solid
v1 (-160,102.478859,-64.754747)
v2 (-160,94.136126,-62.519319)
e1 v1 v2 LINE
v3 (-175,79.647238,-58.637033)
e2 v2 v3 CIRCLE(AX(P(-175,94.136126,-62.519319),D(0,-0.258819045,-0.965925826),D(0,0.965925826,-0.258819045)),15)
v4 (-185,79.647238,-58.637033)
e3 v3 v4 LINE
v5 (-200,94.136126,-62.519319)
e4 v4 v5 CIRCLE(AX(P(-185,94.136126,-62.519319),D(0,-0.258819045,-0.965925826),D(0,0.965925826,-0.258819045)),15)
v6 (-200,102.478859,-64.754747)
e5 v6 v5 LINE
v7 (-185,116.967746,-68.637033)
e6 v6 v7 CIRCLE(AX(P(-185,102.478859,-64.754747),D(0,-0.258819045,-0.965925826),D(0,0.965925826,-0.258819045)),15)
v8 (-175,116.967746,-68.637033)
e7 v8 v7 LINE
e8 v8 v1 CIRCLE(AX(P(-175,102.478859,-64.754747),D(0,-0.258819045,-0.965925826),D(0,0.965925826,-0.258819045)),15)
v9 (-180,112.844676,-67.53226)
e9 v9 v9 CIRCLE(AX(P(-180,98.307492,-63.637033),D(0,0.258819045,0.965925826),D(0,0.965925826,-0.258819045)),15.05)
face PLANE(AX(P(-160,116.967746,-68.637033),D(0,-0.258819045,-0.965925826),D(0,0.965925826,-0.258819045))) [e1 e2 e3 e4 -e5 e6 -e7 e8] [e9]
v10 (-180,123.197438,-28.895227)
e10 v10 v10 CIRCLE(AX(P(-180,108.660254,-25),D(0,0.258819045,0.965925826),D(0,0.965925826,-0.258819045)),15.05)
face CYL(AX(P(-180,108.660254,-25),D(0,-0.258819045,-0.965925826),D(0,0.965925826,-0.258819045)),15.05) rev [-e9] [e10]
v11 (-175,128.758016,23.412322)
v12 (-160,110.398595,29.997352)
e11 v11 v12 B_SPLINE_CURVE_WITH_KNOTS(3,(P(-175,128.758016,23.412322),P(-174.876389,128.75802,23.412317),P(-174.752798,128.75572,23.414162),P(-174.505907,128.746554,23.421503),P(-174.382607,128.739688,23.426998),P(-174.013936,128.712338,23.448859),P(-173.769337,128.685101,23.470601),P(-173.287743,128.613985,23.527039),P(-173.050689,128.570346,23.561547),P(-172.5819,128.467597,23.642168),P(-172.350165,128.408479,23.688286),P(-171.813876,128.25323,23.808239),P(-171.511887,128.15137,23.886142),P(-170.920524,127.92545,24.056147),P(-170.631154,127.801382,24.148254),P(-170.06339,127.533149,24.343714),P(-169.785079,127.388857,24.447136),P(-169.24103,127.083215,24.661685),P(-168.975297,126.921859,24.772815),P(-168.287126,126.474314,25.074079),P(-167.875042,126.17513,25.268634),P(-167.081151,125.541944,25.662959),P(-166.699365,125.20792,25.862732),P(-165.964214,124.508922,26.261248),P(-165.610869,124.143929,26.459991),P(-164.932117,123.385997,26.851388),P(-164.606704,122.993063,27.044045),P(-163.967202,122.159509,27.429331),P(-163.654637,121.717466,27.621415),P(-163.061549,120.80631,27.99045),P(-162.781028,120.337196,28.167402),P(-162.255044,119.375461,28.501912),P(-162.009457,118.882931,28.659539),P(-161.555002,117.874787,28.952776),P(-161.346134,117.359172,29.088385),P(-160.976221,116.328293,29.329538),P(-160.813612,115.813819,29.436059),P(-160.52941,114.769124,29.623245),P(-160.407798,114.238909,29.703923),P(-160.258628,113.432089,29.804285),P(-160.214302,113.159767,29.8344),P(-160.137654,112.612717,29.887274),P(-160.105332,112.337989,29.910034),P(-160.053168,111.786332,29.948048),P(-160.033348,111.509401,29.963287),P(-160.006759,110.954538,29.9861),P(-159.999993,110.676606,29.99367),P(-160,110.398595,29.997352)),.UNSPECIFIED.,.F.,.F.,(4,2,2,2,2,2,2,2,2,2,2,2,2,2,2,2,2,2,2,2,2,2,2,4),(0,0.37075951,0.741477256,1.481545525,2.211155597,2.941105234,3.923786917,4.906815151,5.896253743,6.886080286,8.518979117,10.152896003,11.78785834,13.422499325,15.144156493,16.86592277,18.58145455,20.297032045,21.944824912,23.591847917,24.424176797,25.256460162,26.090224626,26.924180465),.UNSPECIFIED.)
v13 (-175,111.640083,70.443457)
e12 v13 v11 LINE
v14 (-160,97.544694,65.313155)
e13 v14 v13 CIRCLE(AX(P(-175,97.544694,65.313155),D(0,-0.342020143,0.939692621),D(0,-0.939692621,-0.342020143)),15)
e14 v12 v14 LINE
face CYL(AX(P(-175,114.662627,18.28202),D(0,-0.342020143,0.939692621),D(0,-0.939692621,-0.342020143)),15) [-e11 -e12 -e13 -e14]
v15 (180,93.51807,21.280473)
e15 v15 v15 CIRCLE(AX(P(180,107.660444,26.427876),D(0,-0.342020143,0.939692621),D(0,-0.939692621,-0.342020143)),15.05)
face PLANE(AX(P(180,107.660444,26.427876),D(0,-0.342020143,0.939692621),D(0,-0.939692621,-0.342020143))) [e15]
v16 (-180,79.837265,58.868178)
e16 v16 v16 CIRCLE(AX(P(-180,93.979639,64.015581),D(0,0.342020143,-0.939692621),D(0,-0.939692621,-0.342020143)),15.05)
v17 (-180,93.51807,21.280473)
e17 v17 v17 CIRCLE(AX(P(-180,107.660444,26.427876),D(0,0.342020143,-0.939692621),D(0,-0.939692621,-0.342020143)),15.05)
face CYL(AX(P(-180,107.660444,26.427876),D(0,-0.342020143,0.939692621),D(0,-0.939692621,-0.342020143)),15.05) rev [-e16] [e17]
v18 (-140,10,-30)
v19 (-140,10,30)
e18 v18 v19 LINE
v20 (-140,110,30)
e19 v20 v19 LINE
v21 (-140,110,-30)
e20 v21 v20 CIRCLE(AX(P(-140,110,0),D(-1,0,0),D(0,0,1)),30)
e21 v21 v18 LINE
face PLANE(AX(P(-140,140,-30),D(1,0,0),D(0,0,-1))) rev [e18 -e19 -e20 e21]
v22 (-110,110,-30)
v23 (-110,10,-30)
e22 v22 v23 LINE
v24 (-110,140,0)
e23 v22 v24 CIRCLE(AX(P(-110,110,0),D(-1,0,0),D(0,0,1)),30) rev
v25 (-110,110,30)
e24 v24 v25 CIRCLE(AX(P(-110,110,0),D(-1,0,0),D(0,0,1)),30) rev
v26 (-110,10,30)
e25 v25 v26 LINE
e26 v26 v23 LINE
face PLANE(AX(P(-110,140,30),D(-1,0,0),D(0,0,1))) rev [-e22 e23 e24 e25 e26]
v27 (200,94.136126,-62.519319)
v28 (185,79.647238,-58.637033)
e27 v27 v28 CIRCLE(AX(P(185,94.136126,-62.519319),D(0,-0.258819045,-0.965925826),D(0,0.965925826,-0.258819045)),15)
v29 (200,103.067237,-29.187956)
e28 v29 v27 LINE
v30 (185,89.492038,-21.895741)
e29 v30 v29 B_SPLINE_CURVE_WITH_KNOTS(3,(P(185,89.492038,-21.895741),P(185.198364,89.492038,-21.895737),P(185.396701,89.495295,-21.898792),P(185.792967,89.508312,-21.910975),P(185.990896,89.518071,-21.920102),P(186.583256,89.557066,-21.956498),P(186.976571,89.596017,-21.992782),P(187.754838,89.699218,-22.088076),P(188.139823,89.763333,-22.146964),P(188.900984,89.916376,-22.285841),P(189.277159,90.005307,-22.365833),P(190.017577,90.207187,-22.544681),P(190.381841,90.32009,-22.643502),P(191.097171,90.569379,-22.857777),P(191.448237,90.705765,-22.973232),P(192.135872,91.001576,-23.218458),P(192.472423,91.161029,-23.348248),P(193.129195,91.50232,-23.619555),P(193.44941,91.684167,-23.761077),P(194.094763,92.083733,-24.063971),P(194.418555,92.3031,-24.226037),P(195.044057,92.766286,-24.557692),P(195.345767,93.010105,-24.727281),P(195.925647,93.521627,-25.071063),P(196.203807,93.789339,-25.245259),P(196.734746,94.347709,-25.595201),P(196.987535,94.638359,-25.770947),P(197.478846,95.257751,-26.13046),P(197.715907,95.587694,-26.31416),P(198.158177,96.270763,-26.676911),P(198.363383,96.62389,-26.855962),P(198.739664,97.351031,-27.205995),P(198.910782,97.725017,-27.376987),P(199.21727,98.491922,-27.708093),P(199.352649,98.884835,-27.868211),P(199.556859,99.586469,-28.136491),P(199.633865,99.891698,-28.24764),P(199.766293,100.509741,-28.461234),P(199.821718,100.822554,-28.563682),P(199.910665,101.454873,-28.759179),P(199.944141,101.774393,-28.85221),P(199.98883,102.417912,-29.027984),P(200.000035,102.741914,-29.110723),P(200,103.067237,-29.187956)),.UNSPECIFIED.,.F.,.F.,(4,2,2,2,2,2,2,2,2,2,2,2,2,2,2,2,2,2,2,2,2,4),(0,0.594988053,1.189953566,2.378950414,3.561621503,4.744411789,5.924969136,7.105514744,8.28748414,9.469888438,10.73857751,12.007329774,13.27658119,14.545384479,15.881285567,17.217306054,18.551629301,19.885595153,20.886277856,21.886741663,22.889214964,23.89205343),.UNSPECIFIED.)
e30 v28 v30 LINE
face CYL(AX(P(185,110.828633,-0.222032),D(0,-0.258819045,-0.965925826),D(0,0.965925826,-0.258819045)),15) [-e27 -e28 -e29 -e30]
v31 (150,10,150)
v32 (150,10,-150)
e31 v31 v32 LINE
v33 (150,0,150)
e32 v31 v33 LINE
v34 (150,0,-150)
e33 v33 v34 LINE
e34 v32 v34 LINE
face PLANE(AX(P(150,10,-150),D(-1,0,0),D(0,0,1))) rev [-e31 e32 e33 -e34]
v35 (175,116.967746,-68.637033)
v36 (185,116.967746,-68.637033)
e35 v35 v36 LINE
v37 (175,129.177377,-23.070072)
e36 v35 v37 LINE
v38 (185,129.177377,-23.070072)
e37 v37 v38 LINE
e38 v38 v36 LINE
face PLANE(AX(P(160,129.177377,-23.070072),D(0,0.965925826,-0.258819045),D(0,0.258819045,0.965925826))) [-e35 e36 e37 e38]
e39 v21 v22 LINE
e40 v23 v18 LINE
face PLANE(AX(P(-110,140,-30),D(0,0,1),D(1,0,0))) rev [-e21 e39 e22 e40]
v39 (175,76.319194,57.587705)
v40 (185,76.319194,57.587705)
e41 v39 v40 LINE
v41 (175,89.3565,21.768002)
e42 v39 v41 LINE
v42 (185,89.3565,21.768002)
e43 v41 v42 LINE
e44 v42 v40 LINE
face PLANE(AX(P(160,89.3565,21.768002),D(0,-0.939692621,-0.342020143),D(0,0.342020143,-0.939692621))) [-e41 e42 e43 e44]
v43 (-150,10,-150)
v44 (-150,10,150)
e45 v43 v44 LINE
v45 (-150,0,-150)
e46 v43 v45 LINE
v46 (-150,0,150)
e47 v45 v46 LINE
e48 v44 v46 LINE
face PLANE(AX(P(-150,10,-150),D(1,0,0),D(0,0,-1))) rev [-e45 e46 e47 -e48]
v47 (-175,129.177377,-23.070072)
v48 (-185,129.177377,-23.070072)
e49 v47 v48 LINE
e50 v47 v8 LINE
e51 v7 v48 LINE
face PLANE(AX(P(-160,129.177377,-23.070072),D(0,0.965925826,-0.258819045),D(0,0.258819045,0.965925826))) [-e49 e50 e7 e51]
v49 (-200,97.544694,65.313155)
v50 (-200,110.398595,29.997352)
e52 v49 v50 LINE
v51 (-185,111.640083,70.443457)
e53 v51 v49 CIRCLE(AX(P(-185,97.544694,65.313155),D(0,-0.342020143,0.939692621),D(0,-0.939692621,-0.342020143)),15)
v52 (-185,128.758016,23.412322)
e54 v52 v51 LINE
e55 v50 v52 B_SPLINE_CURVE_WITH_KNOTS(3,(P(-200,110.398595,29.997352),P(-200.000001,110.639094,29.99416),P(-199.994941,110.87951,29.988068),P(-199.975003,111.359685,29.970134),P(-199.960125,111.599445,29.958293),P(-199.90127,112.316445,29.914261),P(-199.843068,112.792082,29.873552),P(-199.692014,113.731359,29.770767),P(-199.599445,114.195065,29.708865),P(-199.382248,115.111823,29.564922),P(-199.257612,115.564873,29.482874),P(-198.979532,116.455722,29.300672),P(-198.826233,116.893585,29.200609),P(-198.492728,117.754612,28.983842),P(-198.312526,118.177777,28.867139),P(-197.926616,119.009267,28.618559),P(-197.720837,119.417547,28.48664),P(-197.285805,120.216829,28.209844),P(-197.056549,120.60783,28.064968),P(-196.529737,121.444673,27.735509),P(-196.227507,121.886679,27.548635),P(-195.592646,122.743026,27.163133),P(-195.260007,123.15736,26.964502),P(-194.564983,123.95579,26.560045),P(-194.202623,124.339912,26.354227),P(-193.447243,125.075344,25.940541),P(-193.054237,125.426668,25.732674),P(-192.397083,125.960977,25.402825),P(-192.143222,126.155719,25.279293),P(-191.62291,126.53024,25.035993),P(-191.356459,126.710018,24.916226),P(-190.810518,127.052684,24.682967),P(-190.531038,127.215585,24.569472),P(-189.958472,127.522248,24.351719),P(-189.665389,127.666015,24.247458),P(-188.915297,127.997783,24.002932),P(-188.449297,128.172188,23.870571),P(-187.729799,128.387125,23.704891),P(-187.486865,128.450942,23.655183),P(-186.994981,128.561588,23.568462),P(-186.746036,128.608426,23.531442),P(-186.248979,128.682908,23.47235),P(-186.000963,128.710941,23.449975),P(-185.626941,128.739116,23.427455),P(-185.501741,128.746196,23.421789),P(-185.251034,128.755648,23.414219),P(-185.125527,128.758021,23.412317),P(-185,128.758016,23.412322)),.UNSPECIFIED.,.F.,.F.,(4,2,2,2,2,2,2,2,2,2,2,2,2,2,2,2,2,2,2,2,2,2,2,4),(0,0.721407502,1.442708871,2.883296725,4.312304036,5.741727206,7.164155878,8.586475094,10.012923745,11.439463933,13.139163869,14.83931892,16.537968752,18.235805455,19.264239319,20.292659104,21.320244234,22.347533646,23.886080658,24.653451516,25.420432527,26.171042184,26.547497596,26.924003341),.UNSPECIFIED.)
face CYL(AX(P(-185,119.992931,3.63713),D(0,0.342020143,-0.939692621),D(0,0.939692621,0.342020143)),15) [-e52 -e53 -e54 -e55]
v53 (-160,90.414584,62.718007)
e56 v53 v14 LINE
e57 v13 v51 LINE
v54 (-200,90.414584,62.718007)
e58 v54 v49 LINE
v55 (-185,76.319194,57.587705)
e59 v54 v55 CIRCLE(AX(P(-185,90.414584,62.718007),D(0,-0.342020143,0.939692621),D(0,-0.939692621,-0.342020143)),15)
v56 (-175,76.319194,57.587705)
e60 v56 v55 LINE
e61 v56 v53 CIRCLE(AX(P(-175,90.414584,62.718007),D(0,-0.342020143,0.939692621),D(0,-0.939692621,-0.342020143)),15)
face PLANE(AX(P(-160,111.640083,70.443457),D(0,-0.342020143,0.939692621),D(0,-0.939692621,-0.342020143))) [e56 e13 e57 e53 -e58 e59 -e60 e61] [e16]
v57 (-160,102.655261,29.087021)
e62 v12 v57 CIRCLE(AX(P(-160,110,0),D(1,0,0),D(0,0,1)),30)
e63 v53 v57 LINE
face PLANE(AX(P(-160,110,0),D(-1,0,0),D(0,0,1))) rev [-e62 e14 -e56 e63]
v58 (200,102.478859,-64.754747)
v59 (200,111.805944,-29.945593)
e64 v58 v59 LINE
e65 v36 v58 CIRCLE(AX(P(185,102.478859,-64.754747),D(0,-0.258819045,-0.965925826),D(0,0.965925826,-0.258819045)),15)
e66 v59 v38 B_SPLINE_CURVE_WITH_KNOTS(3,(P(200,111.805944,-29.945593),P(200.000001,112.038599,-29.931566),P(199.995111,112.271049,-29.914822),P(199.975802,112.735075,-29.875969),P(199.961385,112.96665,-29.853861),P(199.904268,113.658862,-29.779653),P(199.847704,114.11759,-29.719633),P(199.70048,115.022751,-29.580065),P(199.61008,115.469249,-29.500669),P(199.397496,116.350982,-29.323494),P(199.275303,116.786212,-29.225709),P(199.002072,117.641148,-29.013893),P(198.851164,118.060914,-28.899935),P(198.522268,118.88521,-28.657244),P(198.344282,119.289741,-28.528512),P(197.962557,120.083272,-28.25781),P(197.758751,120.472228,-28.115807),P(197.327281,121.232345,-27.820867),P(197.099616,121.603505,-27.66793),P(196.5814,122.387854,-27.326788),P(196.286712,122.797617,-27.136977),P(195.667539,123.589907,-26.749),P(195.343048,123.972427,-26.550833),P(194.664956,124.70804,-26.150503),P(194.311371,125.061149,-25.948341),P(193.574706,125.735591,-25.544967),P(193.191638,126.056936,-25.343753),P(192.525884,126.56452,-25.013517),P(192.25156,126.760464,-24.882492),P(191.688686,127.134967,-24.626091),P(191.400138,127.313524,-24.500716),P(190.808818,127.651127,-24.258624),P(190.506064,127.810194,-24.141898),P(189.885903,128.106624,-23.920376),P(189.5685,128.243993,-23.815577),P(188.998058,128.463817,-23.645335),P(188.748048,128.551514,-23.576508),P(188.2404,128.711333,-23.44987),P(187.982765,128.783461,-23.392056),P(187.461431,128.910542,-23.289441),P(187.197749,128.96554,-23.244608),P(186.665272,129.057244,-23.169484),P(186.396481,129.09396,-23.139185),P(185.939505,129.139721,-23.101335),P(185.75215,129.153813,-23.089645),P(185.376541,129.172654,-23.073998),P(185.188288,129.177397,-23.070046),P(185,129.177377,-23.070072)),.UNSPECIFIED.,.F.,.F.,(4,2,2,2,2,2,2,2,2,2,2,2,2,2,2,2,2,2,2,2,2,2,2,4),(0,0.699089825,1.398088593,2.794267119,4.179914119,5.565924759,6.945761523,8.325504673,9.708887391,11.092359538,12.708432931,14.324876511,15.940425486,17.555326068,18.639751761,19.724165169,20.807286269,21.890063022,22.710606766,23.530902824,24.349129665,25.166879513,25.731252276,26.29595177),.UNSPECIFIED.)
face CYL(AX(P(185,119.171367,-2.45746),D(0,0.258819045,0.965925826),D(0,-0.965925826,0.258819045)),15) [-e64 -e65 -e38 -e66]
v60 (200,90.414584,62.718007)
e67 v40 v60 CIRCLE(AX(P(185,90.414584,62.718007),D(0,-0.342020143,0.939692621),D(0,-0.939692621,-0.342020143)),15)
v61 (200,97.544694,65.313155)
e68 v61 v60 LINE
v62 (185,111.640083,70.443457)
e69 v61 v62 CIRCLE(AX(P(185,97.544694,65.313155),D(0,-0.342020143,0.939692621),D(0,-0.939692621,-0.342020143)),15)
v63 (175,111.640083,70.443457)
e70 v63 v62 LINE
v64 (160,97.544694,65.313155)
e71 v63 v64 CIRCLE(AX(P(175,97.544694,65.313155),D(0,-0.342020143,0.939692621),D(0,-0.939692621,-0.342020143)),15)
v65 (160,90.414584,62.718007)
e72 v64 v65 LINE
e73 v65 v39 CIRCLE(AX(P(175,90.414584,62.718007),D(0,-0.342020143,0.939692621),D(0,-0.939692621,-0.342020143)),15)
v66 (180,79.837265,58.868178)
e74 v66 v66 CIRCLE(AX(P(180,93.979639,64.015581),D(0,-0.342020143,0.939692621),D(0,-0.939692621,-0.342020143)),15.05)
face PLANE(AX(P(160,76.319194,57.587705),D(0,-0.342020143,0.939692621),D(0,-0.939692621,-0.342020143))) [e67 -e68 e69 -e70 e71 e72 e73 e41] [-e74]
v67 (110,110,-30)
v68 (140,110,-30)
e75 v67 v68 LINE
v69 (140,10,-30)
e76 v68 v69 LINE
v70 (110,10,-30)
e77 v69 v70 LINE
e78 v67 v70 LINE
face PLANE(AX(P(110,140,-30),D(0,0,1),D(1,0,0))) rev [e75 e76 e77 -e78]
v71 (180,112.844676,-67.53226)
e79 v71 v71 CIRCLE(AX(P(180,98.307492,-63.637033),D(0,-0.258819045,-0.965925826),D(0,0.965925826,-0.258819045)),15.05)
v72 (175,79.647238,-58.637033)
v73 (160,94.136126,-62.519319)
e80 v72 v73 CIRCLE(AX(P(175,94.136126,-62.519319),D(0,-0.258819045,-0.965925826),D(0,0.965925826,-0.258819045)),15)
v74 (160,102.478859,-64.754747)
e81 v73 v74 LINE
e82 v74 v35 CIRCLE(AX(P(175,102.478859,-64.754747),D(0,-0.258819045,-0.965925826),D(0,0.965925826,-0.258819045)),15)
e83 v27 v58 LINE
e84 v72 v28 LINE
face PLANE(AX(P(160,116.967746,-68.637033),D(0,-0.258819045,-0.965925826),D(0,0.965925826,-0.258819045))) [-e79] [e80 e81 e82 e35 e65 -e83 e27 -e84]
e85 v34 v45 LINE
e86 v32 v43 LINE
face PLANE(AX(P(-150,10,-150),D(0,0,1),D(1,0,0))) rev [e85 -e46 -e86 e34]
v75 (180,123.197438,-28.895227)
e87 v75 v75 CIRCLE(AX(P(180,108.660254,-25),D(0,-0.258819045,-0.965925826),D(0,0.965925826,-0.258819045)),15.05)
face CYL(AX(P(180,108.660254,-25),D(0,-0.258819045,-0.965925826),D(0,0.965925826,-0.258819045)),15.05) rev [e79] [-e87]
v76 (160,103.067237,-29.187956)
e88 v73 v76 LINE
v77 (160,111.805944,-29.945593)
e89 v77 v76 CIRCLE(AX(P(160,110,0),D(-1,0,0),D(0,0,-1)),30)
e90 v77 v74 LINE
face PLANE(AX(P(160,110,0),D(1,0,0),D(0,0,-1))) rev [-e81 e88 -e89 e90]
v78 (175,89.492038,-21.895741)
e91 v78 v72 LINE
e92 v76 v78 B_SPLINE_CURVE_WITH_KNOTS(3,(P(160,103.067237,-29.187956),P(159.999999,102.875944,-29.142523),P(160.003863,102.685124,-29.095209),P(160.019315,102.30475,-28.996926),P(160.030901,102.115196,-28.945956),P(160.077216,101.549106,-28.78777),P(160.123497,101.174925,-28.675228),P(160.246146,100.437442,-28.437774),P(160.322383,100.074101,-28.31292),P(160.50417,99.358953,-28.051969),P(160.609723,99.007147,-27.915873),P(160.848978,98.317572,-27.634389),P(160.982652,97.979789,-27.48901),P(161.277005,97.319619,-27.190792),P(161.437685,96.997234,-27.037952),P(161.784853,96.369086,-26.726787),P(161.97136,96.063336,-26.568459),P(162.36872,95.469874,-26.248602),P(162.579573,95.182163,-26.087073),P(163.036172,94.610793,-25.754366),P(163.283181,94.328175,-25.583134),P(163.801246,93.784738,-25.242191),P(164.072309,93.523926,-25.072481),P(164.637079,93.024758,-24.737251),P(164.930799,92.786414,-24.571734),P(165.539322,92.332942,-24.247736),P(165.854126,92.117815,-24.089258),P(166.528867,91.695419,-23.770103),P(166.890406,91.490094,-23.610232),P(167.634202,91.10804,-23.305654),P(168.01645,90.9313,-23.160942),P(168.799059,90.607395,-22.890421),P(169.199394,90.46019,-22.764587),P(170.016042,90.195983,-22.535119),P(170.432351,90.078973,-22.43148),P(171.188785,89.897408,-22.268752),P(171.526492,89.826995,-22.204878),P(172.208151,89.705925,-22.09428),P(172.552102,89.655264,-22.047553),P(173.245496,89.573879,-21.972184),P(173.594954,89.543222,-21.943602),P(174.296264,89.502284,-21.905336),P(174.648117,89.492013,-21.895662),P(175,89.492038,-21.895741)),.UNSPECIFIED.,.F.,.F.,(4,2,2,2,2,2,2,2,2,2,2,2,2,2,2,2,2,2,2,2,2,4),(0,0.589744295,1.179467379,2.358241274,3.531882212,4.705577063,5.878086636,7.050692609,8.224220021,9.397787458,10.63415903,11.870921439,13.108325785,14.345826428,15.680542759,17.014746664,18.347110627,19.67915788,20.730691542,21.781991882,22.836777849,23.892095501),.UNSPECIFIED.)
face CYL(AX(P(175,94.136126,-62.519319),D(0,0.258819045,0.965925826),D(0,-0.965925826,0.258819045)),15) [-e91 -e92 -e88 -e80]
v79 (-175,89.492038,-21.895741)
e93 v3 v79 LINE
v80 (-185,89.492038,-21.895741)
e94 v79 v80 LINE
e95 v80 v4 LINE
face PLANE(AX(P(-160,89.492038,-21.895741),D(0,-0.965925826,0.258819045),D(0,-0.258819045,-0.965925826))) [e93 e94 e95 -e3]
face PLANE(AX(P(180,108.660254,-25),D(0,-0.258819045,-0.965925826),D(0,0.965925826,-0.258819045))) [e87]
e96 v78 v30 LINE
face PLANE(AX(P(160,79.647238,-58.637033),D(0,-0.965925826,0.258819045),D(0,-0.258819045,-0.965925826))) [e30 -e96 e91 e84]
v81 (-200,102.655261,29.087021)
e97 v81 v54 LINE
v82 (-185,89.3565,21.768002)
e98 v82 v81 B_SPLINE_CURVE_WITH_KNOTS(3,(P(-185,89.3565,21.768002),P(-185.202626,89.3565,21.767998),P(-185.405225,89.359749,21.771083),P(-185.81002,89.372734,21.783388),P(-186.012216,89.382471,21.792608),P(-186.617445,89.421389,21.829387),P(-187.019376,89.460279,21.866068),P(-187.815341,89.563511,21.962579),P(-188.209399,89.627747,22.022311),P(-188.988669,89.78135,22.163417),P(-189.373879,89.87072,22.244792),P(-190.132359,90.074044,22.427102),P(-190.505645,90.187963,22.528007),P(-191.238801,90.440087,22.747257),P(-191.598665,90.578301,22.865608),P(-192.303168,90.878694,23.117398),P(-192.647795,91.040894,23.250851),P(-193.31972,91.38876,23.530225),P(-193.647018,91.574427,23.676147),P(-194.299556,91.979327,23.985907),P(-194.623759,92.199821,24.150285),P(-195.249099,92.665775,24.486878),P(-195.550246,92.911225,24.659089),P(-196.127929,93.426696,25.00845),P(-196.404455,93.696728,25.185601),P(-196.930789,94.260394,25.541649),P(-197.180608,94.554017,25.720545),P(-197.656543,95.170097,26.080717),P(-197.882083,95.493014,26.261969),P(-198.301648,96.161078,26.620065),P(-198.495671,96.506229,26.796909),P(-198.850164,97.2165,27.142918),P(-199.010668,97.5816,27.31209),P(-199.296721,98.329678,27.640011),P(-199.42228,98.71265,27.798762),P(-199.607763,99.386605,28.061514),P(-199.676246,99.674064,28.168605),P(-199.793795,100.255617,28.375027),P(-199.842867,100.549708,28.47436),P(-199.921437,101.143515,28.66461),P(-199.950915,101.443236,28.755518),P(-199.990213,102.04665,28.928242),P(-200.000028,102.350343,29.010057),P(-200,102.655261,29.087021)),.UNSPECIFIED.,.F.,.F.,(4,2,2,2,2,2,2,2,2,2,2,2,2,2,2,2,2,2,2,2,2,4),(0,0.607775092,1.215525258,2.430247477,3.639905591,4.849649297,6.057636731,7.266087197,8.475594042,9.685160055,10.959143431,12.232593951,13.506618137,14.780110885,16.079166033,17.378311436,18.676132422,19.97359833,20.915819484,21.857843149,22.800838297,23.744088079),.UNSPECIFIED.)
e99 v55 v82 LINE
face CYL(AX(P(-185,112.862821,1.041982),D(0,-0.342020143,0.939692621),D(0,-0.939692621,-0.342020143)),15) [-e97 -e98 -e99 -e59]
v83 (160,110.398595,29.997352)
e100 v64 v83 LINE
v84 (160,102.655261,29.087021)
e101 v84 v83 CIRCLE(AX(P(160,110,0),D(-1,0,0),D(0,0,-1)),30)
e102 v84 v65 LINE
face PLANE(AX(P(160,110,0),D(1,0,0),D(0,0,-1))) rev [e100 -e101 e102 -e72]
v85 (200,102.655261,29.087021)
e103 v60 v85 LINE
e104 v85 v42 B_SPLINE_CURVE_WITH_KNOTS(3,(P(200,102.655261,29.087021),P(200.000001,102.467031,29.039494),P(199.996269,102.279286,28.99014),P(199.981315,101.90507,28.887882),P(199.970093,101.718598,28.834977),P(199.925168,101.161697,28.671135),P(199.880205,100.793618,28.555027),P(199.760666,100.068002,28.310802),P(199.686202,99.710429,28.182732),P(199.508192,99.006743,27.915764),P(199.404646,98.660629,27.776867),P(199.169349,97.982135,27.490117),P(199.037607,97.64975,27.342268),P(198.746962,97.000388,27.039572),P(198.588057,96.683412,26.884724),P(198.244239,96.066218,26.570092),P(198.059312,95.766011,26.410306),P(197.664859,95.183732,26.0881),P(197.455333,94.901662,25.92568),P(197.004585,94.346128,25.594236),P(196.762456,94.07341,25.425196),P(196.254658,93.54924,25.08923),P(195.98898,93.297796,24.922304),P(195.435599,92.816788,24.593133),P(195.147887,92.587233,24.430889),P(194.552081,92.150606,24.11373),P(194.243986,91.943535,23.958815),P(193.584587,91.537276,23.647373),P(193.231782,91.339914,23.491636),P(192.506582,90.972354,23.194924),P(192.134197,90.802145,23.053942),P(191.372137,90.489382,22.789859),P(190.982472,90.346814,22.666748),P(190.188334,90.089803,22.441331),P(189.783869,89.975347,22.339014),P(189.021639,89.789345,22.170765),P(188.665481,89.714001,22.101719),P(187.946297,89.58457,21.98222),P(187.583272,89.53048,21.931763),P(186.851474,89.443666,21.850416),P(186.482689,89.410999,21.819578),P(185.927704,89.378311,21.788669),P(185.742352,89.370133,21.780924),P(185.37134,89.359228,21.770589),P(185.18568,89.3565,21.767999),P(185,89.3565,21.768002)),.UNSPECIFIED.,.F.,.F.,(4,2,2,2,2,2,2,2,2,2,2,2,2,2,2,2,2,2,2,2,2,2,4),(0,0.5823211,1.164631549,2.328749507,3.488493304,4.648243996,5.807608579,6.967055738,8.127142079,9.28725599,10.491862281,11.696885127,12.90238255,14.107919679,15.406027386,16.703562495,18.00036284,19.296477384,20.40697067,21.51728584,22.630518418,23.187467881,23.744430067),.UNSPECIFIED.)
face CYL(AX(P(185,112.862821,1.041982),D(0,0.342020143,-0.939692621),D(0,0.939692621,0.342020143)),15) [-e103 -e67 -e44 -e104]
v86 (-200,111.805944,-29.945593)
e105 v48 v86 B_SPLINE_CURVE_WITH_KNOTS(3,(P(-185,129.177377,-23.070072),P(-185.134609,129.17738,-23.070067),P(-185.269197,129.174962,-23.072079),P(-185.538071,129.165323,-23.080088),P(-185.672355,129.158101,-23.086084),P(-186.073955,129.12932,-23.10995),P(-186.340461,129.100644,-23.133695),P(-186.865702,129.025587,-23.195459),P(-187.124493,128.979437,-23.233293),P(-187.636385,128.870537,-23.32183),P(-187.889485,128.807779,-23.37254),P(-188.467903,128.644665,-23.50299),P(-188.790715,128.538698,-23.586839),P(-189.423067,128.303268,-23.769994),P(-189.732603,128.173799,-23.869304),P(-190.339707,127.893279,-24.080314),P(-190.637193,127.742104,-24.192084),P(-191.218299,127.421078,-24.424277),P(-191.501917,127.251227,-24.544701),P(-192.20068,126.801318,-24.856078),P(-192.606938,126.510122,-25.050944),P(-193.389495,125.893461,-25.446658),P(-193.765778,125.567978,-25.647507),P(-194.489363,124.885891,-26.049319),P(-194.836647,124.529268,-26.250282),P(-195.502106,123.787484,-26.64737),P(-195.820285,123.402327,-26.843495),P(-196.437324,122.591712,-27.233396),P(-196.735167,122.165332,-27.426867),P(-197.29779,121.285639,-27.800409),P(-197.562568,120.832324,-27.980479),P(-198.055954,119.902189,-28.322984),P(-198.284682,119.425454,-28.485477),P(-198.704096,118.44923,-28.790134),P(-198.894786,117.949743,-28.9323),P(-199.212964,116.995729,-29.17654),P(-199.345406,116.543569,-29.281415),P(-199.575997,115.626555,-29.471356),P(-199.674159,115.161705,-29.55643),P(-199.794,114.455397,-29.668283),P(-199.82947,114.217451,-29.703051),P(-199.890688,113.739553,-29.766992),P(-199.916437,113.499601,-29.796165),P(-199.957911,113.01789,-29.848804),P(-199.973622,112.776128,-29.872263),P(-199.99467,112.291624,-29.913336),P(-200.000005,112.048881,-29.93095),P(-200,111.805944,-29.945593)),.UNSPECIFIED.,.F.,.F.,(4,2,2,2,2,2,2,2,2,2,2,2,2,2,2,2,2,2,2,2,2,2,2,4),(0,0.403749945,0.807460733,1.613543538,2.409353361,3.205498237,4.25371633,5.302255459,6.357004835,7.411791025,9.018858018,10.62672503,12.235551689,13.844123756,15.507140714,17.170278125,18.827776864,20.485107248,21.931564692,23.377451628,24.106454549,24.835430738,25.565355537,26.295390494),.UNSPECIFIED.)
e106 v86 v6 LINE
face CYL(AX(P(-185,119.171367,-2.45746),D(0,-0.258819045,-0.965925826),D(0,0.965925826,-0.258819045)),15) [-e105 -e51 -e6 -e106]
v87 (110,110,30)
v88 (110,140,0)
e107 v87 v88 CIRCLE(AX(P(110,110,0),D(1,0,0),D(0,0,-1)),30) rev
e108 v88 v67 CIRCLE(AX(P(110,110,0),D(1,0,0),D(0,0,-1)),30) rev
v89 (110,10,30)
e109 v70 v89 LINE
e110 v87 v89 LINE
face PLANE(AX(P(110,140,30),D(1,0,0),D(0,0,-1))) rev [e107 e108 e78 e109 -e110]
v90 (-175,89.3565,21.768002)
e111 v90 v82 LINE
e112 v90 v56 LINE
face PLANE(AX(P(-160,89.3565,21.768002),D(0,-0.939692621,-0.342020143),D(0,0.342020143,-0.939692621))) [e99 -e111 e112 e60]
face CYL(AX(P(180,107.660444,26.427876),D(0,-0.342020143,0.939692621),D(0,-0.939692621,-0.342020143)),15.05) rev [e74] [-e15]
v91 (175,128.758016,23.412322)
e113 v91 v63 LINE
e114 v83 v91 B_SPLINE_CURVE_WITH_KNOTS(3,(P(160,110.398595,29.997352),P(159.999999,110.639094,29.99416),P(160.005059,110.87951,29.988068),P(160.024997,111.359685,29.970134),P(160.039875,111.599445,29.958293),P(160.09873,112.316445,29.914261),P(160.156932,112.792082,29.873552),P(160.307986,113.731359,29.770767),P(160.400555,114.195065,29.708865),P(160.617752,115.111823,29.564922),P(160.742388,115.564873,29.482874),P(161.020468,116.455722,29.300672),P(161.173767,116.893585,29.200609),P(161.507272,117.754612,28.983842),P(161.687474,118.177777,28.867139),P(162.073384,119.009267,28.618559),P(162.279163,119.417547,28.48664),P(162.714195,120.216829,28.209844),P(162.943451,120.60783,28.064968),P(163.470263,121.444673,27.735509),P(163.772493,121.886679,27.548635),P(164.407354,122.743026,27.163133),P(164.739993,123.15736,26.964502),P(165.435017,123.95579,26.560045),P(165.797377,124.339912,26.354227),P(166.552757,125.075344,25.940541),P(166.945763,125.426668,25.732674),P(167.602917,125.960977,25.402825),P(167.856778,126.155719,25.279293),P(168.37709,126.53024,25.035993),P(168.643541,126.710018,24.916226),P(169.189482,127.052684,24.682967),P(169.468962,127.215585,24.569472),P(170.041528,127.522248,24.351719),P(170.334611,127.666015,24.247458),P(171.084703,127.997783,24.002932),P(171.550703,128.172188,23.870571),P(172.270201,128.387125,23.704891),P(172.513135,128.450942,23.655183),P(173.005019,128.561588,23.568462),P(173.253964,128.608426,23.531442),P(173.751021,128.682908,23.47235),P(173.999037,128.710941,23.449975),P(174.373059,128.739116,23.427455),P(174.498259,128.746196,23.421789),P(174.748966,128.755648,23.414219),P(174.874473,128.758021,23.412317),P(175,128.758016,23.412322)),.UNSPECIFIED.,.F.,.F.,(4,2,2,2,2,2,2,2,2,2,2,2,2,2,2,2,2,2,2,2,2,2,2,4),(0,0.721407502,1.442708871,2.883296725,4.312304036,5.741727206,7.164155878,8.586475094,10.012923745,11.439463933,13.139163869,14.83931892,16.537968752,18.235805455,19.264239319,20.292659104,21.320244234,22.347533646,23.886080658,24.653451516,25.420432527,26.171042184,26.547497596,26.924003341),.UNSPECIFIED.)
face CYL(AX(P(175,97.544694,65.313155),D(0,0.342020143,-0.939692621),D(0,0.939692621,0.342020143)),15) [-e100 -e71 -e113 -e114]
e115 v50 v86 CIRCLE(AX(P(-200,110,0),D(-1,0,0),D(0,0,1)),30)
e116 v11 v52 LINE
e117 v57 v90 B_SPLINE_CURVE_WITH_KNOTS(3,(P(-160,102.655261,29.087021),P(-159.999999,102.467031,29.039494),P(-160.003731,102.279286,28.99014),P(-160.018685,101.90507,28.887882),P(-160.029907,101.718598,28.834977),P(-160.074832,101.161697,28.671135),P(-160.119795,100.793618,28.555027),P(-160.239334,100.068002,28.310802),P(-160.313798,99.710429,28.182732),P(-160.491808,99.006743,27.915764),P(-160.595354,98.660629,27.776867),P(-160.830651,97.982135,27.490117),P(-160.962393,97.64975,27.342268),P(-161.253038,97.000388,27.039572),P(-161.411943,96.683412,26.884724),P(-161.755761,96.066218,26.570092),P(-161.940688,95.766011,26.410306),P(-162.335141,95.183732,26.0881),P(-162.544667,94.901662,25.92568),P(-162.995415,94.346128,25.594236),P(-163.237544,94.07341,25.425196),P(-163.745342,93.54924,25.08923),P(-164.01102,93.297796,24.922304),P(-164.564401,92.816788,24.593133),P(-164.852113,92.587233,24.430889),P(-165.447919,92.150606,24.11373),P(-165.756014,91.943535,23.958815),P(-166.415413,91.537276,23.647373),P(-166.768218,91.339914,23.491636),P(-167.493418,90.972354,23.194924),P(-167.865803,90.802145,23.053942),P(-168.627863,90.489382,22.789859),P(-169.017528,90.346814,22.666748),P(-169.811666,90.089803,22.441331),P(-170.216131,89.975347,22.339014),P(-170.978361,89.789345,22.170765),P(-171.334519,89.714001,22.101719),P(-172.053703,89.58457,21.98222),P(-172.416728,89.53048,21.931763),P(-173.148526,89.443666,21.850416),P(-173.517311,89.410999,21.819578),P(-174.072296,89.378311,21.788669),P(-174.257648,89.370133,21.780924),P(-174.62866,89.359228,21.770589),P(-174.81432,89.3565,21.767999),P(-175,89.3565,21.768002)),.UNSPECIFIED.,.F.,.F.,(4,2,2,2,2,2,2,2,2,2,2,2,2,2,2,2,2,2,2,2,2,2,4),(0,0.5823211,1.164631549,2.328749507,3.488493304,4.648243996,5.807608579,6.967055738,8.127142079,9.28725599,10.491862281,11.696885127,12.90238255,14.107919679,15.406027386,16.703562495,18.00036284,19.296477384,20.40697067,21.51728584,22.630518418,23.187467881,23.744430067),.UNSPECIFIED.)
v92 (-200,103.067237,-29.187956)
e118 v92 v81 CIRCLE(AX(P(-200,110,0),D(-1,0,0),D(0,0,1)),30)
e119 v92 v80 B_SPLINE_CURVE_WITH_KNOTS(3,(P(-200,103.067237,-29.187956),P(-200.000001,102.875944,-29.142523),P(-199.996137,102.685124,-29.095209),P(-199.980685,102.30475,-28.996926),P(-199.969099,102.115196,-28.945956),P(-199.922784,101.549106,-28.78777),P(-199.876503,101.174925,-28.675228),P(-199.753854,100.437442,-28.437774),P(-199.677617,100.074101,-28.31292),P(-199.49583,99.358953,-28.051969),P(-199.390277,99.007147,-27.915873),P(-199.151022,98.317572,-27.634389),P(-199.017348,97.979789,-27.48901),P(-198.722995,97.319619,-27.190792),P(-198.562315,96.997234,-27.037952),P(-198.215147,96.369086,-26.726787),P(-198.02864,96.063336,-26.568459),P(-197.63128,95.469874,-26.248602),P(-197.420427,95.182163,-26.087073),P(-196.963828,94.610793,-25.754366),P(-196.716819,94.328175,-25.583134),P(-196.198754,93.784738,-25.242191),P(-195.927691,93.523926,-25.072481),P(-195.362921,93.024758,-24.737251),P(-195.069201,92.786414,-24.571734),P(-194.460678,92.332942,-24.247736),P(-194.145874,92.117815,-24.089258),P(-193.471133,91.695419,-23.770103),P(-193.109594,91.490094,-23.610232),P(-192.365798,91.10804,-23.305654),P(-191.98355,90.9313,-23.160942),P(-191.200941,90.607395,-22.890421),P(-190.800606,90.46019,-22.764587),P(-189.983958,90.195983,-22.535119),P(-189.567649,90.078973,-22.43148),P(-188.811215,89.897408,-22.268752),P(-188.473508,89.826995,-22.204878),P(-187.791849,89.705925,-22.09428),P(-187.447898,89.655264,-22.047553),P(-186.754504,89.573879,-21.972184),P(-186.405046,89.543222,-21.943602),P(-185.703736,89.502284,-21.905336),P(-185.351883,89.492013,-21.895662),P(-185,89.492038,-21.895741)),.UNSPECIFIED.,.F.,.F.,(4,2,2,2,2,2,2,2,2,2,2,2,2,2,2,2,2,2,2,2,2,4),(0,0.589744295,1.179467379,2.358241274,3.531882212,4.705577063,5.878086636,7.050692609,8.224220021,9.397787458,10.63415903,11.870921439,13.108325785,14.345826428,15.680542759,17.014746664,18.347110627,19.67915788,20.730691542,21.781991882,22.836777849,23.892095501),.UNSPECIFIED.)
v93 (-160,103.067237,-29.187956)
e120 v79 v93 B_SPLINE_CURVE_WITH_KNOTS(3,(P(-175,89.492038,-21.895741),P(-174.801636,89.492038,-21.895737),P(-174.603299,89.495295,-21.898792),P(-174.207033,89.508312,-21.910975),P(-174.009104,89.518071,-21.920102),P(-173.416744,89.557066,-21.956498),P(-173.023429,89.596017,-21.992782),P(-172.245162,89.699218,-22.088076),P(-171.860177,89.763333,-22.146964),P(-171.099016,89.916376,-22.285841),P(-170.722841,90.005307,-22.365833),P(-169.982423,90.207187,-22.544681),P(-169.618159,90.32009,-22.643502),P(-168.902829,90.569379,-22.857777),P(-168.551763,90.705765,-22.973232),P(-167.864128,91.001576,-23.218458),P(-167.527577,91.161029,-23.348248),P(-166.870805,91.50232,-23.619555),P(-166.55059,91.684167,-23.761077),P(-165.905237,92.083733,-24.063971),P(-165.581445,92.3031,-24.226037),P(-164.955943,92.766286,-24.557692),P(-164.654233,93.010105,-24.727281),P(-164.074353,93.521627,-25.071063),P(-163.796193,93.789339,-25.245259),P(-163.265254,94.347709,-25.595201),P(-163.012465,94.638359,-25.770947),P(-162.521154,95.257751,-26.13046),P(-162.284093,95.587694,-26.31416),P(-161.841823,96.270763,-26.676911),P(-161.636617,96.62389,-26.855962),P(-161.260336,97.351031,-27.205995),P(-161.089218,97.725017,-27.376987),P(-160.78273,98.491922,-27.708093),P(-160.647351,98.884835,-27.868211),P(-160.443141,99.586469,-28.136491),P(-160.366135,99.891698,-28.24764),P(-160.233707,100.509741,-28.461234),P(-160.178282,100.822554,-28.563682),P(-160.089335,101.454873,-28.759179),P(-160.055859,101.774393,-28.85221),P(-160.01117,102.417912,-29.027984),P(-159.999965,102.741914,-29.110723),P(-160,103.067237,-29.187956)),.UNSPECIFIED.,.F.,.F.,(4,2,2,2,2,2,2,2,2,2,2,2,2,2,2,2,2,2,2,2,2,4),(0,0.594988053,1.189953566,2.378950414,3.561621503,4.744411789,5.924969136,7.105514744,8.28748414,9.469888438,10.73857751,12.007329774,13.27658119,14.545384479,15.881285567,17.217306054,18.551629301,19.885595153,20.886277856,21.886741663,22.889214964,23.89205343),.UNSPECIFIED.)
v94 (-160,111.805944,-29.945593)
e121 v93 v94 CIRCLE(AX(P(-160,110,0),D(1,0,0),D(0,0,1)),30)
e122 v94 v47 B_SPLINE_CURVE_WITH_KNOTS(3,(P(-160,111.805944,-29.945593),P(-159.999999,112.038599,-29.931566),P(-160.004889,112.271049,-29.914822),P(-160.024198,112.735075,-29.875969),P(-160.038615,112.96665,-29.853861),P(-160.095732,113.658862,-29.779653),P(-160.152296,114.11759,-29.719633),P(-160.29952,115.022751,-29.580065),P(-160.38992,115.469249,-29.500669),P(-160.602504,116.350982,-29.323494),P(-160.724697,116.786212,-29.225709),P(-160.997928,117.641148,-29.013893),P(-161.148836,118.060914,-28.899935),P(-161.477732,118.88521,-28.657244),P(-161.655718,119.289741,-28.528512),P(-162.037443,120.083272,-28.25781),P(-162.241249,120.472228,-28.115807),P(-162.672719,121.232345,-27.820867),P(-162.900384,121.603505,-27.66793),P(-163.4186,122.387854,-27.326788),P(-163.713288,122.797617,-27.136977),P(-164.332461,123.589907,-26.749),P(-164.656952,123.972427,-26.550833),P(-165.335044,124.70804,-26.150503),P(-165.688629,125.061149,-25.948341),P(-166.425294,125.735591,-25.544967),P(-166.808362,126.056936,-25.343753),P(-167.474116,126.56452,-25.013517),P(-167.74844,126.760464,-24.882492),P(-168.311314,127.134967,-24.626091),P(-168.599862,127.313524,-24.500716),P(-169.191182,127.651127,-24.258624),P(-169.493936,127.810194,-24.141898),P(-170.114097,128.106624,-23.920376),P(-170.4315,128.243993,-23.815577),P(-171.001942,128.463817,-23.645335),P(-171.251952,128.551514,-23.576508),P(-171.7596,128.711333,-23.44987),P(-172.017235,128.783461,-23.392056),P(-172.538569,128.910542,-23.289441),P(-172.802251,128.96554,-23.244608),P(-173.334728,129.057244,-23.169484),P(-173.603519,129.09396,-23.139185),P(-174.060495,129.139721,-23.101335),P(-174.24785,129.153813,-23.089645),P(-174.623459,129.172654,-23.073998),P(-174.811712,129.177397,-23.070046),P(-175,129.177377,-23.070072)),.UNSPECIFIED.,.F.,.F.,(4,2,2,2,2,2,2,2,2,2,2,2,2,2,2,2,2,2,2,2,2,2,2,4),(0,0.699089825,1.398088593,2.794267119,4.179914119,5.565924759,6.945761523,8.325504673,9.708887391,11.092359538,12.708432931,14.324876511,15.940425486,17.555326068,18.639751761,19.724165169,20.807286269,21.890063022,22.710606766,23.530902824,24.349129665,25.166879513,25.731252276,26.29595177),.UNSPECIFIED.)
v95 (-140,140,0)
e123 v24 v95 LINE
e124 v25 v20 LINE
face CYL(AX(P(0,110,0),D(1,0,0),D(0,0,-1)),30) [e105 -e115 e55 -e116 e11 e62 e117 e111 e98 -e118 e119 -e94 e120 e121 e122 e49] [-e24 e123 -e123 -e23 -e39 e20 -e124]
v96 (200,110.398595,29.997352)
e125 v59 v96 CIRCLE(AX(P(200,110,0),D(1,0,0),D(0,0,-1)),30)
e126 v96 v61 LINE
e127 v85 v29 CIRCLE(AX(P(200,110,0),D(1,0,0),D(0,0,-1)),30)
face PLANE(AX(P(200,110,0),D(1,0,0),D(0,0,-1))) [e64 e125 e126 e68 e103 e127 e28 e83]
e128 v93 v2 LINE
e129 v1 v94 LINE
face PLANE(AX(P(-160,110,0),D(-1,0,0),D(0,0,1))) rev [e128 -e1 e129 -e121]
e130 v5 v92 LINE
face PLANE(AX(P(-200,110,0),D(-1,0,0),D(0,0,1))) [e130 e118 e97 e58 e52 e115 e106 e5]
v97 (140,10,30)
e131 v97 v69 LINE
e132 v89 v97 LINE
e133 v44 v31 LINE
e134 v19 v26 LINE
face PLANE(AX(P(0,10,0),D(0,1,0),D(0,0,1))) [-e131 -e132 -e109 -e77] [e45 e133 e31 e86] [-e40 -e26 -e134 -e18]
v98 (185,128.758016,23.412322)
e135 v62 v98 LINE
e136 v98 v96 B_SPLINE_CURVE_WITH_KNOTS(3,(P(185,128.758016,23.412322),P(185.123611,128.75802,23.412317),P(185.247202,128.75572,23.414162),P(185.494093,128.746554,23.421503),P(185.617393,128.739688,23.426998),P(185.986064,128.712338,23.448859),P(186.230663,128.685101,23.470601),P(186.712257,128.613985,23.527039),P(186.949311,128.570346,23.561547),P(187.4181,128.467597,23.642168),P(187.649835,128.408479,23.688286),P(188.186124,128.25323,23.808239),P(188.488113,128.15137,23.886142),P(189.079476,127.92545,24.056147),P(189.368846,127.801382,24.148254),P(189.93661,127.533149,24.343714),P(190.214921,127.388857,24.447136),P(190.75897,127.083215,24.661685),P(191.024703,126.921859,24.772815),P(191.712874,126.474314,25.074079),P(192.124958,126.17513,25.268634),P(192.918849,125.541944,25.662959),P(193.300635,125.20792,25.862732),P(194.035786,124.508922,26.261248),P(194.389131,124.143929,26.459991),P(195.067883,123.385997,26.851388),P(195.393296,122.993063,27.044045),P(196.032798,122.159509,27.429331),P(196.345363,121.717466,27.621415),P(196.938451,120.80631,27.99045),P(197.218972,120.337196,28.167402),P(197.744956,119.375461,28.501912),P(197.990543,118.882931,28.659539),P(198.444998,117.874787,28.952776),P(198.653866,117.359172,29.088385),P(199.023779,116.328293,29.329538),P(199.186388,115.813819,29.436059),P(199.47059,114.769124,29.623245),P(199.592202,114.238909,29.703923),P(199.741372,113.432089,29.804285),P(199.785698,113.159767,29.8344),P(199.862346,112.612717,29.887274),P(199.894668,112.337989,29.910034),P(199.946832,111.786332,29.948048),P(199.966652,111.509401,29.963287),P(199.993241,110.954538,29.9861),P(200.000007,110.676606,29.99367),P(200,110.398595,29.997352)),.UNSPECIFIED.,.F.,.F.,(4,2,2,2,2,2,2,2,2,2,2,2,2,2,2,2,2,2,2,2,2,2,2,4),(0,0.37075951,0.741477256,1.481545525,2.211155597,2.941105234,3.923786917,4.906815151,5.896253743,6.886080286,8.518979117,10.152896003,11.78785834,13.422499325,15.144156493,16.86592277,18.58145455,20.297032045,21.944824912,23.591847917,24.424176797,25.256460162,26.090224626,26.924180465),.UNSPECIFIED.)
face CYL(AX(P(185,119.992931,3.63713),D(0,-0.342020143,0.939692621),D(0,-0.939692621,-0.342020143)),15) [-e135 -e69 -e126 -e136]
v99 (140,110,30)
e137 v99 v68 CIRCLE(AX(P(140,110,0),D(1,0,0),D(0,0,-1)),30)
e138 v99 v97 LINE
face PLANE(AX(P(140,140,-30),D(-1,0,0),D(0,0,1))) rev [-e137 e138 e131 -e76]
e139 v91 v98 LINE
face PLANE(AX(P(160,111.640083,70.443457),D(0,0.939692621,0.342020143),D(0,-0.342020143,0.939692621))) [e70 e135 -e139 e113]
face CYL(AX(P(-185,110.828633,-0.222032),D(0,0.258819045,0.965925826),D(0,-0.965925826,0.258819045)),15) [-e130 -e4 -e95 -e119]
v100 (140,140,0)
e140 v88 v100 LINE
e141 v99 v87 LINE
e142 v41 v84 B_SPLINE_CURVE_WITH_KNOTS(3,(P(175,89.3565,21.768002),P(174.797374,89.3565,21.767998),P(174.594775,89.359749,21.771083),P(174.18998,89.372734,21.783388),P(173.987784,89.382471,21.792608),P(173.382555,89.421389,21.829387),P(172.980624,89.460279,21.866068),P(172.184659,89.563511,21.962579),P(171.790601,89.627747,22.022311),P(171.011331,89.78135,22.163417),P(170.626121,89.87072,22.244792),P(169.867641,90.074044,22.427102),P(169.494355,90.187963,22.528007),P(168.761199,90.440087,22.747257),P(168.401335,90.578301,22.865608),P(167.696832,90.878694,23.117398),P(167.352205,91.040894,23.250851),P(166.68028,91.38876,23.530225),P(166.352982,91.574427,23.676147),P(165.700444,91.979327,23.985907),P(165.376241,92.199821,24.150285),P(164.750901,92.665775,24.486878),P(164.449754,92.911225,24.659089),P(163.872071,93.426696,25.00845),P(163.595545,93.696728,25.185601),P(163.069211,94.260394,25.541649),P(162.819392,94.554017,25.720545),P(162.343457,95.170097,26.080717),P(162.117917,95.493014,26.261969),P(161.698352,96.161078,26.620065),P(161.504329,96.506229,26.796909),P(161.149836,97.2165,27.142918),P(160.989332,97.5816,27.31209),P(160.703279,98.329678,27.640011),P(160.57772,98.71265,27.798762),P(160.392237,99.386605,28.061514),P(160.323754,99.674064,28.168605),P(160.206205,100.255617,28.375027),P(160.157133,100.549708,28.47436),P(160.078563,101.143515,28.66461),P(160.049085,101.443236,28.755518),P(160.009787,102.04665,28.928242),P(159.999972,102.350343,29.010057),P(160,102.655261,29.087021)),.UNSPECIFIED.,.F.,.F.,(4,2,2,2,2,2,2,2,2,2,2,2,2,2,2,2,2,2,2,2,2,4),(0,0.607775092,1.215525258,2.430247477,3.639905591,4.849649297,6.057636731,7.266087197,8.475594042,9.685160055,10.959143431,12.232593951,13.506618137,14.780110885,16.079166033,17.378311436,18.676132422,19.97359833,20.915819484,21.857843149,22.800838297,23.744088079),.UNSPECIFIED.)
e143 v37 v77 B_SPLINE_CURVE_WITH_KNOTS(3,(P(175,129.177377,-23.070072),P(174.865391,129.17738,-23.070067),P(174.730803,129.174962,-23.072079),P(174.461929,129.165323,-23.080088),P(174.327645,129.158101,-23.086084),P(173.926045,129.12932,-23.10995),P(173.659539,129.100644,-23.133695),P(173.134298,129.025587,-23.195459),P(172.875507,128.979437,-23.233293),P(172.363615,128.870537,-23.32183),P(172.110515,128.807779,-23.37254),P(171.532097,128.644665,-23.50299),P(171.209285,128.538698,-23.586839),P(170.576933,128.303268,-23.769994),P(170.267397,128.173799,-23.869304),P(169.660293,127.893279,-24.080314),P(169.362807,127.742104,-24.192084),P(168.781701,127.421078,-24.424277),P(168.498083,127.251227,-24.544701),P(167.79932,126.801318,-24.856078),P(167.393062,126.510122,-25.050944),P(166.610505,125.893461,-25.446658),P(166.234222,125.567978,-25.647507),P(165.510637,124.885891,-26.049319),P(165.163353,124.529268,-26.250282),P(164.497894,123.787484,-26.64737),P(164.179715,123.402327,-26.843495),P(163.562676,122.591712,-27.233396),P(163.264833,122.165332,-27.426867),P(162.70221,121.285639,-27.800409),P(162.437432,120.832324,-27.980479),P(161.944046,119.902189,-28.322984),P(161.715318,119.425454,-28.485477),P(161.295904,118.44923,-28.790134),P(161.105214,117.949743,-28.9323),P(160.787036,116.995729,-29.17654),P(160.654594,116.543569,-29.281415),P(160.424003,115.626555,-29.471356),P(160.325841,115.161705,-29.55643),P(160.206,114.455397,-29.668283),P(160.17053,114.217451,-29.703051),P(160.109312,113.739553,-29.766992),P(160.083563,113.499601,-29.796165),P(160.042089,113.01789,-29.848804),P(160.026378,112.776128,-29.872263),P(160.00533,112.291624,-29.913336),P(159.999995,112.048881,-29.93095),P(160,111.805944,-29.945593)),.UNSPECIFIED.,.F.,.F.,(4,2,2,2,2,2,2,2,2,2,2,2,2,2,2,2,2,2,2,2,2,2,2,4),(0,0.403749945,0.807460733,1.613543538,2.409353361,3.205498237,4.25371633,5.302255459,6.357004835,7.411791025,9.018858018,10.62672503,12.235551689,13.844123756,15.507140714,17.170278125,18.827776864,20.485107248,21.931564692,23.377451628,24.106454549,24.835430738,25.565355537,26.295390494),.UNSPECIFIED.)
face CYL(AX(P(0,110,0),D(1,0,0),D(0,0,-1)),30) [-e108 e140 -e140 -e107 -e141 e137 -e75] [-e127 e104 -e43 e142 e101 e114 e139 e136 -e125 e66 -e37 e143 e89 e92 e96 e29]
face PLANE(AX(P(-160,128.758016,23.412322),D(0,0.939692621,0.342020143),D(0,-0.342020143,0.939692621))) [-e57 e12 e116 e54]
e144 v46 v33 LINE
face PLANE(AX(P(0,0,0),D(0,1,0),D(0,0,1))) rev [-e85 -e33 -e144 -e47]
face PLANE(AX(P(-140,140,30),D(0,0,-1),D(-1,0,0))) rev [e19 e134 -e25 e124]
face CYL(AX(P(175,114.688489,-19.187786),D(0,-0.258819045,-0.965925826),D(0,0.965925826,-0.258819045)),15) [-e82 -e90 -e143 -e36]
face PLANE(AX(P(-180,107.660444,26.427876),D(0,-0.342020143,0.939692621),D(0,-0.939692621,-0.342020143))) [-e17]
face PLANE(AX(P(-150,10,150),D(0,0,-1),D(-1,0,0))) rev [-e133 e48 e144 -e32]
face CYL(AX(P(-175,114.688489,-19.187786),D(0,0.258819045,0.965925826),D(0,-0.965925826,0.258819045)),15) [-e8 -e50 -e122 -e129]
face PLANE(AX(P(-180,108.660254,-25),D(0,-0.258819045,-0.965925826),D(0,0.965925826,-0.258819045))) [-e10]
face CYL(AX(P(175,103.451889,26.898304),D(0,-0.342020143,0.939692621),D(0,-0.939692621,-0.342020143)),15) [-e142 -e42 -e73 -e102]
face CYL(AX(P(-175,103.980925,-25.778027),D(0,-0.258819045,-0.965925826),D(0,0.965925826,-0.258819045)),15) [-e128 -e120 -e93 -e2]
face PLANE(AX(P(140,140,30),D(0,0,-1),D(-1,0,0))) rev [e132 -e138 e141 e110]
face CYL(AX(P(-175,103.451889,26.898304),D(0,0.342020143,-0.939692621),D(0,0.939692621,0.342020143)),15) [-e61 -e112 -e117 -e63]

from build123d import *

# Parameters (mm, degrees)
SKETCH2_W           = 300
SKETCH2_H           = 300
BOSS_EXTRUDE1_DEPTH = 10
SKETCH3_W           = 30
SKETCH3_H           = 60
BOSS_EXTRUDE2_DEPTH = 130
FILLET1_R           = 30
SKETCH4_R           = 30
BOSS_EXTRUDE4_DEPTH = 60
BOSS_EXTRUDE5_START = 60
SKETCH5_R           = 30
BOSS_EXTRUDE5_DEPTH = 60
BOSS_EXTRUDE6_START = -40
BOSS_EXTRUDE6_DEPTH = 40
BOSS_EXTRUDE7_DEPTH = 40
SKETCH8_R           = 15.05
CUT_EXTRUDE1_DEPTH  = 40
SKETCH9_R           = 15.05
CUT_EXTRUDE2_DEPTH  = 40
FILLET2_R           = 15


with BuildPart() as part:
    # Sketch2 → Boss-Extrude1 (new body)
    with BuildSketch(Plane(origin=(0, 0, 0), x_dir=(1, 0, 0), z_dir=(0, 1, 0))):
        Rectangle(SKETCH2_W, SKETCH2_H)
    extrude(amount=BOSS_EXTRUDE1_DEPTH)

    # Sketch3 → Boss-Extrude2 (add)
    with BuildSketch(Plane(origin=(0, 10, 0), x_dir=(1, 0, 0), z_dir=(0, 1, 0))):
        with Locations((-125, 0)):
            Rectangle(SKETCH3_W, SKETCH3_H)
        with Locations((125, 0)):
            Rectangle(SKETCH3_W, SKETCH3_H)
    extrude(amount=BOSS_EXTRUDE2_DEPTH)

    # Fillet1
    fillet1_edges = [part.edges().sort_by_distance(p)[0] for p in [
        (125, 140, -30),
        (125, 140, 30),
        (-125, 140, 30),
        (-125, 140, -30),
    ]]
    fillet(fillet1_edges, radius=FILLET1_R - 0.0001)  # a hair under: the kernel refuses the full size

    # Sketch4 → Boss-Extrude4 (add)
    with BuildSketch(Plane.ZY.offset(140)):
        with Locations((0, 110)):
            Circle(SKETCH4_R)
    extrude(amount=BOSS_EXTRUDE4_DEPTH)

    # Sketch5 → Boss-Extrude5 (add)
    with BuildSketch(Plane(origin=(140, 0, 0), x_dir=(0, 0, -1), z_dir=(1, 0, 0)).offset(BOSS_EXTRUDE5_START)):
        with Locations((0, 110)):
            Circle(SKETCH5_R)
    extrude(amount=-BOSS_EXTRUDE5_DEPTH)

    # Sketch6 → Boss-Extrude6 (add)
    with BuildSketch(Plane.ZY.offset(200).offset(BOSS_EXTRUDE6_START)):
        with BuildLine():
            Line((-21.895741175, 89.492037683), (-58.637033052, 79.647238196))
            Line((-58.637033052, 79.647238196), (-68.637033052, 116.967746272))
            Line((-68.637033052, 116.967746272), (-23.070072037, 129.177376677))
            ThreePointArc((-23.070072037, 129.177376677), (-29.986874166, 109.112656899), (-21.895741175, 89.492037683))
        make_face()
        with BuildLine():
            Line((21.768001871, 89.356499945), (57.587704831, 76.319194267))
            Line((57.587704831, 76.319194267), (70.443457025, 111.640083129))
            Line((70.443457025, 111.640083129), (23.412322022, 128.758016354))
            ThreePointArc((23.412322022, 128.758016354), (29.973910166, 108.749116558), (21.768001871, 89.356499945))
        make_face()
    extrude(amount=BOSS_EXTRUDE6_DEPTH)

    # Sketch7 → Boss-Extrude7 (add)
    with BuildSketch(Plane(origin=(200, 0, 0), x_dir=(0, 0, -1), z_dir=(1, 0, 0))):
        with BuildLine():
            Line((-21.768001871, 89.356499945), (-57.587704831, 76.319194267))
            Line((-57.587704831, 76.319194267), (-70.443457025, 111.640083129))
            Line((-70.443457025, 111.640083129), (-23.412322022, 128.758016354))
            ThreePointArc((-23.412322022, 128.758016354), (-29.973910166, 108.749116558), (-21.768001871, 89.356499945))
        make_face()
        with BuildLine():
            Line((23.070072037, 129.177376677), (68.637033052, 116.967746272))
            Line((68.637033052, 116.967746272), (58.637033052, 79.647238196))
            Line((58.637033052, 79.647238196), (21.895741175, 89.492037683))
            ThreePointArc((21.895741175, 89.492037683), (29.986874166, 109.112656899), (23.070072037, 129.177376677))
        make_face()
    extrude(amount=-BOSS_EXTRUDE7_DEPTH)

    # Sketch8 → Cut-Extrude1 (cut)
    with BuildSketch(Plane(origin=(0, -9.323904974, -34.797287089), x_dir=(-1, 0, 0), z_dir=(0, -0.2588190451025219, -0.965925826289068))):
        with Locations(Location((-180, 111.428221794, 0), (0, 0, 90))):
            Circle(SKETCH8_R)
    cut_extrude1 = extrude(amount=-CUT_EXTRUDE1_DEPTH, mode=Mode.SUBTRACT)

    # Mirror1: Cut-Extrude1 across plane
    add(cut_extrude1.mirror(Plane(origin=(0, 0, 0), x_dir=(0, 0, 1), z_dir=(1, 0, 0))), mode=Mode.SUBTRACT)

    # Sketch9 → Cut-Extrude2 (cut)
    with BuildSketch(Plane(origin=(0, -9.58068177, 26.322706827), x_dir=(1, 0, 0), z_dir=(0, -0.3420201433256628, 0.9396926207859106))):
        with Locations(Location((180, 110.206591153, 0), (0, 0, 270))):
            Circle(SKETCH9_R)
    cut_extrude2 = extrude(amount=-CUT_EXTRUDE2_DEPTH, mode=Mode.SUBTRACT)

    # Mirror2: Cut-Extrude2 across plane
    add(cut_extrude2.mirror(Plane(origin=(0, 0, 0), x_dir=(0, 0, 1), z_dir=(1, 0, 0))), mode=Mode.SUBTRACT)

    # Fillet2
    fillet2_edges = [part.edges().sort_by_distance(p)[0] for p in [
        (160, 120.199049742, 46.927889523),
        (160, 82.837847106, 39.677853351),
        (200, 120.199049742, 46.927889523),
        (200, 82.837847106, 39.677853351),
        (160, 84.569637939, -40.266387113),
        (160, 123.072561474, -45.853552544),
        (200, 123.072561474, -45.853552544),
        (200, 84.569637939, -40.266387113),
        (-160, 123.072561474, -45.853552544),
        (-160, 84.569637939, -40.266387113),
        (-200, 84.569637939, -40.266387113),
        (-200, 123.072561474, -45.853552544),
        (-160, 82.837847106, 39.677853351),
        (-160, 120.199049742, 46.927889523),
        (-200, 120.199049742, 46.927889523),
        (-200, 82.837847106, 39.677853351),
    ]]
    fillet(fillet2_edges, radius=FILLET2_R)


solid = part.part
